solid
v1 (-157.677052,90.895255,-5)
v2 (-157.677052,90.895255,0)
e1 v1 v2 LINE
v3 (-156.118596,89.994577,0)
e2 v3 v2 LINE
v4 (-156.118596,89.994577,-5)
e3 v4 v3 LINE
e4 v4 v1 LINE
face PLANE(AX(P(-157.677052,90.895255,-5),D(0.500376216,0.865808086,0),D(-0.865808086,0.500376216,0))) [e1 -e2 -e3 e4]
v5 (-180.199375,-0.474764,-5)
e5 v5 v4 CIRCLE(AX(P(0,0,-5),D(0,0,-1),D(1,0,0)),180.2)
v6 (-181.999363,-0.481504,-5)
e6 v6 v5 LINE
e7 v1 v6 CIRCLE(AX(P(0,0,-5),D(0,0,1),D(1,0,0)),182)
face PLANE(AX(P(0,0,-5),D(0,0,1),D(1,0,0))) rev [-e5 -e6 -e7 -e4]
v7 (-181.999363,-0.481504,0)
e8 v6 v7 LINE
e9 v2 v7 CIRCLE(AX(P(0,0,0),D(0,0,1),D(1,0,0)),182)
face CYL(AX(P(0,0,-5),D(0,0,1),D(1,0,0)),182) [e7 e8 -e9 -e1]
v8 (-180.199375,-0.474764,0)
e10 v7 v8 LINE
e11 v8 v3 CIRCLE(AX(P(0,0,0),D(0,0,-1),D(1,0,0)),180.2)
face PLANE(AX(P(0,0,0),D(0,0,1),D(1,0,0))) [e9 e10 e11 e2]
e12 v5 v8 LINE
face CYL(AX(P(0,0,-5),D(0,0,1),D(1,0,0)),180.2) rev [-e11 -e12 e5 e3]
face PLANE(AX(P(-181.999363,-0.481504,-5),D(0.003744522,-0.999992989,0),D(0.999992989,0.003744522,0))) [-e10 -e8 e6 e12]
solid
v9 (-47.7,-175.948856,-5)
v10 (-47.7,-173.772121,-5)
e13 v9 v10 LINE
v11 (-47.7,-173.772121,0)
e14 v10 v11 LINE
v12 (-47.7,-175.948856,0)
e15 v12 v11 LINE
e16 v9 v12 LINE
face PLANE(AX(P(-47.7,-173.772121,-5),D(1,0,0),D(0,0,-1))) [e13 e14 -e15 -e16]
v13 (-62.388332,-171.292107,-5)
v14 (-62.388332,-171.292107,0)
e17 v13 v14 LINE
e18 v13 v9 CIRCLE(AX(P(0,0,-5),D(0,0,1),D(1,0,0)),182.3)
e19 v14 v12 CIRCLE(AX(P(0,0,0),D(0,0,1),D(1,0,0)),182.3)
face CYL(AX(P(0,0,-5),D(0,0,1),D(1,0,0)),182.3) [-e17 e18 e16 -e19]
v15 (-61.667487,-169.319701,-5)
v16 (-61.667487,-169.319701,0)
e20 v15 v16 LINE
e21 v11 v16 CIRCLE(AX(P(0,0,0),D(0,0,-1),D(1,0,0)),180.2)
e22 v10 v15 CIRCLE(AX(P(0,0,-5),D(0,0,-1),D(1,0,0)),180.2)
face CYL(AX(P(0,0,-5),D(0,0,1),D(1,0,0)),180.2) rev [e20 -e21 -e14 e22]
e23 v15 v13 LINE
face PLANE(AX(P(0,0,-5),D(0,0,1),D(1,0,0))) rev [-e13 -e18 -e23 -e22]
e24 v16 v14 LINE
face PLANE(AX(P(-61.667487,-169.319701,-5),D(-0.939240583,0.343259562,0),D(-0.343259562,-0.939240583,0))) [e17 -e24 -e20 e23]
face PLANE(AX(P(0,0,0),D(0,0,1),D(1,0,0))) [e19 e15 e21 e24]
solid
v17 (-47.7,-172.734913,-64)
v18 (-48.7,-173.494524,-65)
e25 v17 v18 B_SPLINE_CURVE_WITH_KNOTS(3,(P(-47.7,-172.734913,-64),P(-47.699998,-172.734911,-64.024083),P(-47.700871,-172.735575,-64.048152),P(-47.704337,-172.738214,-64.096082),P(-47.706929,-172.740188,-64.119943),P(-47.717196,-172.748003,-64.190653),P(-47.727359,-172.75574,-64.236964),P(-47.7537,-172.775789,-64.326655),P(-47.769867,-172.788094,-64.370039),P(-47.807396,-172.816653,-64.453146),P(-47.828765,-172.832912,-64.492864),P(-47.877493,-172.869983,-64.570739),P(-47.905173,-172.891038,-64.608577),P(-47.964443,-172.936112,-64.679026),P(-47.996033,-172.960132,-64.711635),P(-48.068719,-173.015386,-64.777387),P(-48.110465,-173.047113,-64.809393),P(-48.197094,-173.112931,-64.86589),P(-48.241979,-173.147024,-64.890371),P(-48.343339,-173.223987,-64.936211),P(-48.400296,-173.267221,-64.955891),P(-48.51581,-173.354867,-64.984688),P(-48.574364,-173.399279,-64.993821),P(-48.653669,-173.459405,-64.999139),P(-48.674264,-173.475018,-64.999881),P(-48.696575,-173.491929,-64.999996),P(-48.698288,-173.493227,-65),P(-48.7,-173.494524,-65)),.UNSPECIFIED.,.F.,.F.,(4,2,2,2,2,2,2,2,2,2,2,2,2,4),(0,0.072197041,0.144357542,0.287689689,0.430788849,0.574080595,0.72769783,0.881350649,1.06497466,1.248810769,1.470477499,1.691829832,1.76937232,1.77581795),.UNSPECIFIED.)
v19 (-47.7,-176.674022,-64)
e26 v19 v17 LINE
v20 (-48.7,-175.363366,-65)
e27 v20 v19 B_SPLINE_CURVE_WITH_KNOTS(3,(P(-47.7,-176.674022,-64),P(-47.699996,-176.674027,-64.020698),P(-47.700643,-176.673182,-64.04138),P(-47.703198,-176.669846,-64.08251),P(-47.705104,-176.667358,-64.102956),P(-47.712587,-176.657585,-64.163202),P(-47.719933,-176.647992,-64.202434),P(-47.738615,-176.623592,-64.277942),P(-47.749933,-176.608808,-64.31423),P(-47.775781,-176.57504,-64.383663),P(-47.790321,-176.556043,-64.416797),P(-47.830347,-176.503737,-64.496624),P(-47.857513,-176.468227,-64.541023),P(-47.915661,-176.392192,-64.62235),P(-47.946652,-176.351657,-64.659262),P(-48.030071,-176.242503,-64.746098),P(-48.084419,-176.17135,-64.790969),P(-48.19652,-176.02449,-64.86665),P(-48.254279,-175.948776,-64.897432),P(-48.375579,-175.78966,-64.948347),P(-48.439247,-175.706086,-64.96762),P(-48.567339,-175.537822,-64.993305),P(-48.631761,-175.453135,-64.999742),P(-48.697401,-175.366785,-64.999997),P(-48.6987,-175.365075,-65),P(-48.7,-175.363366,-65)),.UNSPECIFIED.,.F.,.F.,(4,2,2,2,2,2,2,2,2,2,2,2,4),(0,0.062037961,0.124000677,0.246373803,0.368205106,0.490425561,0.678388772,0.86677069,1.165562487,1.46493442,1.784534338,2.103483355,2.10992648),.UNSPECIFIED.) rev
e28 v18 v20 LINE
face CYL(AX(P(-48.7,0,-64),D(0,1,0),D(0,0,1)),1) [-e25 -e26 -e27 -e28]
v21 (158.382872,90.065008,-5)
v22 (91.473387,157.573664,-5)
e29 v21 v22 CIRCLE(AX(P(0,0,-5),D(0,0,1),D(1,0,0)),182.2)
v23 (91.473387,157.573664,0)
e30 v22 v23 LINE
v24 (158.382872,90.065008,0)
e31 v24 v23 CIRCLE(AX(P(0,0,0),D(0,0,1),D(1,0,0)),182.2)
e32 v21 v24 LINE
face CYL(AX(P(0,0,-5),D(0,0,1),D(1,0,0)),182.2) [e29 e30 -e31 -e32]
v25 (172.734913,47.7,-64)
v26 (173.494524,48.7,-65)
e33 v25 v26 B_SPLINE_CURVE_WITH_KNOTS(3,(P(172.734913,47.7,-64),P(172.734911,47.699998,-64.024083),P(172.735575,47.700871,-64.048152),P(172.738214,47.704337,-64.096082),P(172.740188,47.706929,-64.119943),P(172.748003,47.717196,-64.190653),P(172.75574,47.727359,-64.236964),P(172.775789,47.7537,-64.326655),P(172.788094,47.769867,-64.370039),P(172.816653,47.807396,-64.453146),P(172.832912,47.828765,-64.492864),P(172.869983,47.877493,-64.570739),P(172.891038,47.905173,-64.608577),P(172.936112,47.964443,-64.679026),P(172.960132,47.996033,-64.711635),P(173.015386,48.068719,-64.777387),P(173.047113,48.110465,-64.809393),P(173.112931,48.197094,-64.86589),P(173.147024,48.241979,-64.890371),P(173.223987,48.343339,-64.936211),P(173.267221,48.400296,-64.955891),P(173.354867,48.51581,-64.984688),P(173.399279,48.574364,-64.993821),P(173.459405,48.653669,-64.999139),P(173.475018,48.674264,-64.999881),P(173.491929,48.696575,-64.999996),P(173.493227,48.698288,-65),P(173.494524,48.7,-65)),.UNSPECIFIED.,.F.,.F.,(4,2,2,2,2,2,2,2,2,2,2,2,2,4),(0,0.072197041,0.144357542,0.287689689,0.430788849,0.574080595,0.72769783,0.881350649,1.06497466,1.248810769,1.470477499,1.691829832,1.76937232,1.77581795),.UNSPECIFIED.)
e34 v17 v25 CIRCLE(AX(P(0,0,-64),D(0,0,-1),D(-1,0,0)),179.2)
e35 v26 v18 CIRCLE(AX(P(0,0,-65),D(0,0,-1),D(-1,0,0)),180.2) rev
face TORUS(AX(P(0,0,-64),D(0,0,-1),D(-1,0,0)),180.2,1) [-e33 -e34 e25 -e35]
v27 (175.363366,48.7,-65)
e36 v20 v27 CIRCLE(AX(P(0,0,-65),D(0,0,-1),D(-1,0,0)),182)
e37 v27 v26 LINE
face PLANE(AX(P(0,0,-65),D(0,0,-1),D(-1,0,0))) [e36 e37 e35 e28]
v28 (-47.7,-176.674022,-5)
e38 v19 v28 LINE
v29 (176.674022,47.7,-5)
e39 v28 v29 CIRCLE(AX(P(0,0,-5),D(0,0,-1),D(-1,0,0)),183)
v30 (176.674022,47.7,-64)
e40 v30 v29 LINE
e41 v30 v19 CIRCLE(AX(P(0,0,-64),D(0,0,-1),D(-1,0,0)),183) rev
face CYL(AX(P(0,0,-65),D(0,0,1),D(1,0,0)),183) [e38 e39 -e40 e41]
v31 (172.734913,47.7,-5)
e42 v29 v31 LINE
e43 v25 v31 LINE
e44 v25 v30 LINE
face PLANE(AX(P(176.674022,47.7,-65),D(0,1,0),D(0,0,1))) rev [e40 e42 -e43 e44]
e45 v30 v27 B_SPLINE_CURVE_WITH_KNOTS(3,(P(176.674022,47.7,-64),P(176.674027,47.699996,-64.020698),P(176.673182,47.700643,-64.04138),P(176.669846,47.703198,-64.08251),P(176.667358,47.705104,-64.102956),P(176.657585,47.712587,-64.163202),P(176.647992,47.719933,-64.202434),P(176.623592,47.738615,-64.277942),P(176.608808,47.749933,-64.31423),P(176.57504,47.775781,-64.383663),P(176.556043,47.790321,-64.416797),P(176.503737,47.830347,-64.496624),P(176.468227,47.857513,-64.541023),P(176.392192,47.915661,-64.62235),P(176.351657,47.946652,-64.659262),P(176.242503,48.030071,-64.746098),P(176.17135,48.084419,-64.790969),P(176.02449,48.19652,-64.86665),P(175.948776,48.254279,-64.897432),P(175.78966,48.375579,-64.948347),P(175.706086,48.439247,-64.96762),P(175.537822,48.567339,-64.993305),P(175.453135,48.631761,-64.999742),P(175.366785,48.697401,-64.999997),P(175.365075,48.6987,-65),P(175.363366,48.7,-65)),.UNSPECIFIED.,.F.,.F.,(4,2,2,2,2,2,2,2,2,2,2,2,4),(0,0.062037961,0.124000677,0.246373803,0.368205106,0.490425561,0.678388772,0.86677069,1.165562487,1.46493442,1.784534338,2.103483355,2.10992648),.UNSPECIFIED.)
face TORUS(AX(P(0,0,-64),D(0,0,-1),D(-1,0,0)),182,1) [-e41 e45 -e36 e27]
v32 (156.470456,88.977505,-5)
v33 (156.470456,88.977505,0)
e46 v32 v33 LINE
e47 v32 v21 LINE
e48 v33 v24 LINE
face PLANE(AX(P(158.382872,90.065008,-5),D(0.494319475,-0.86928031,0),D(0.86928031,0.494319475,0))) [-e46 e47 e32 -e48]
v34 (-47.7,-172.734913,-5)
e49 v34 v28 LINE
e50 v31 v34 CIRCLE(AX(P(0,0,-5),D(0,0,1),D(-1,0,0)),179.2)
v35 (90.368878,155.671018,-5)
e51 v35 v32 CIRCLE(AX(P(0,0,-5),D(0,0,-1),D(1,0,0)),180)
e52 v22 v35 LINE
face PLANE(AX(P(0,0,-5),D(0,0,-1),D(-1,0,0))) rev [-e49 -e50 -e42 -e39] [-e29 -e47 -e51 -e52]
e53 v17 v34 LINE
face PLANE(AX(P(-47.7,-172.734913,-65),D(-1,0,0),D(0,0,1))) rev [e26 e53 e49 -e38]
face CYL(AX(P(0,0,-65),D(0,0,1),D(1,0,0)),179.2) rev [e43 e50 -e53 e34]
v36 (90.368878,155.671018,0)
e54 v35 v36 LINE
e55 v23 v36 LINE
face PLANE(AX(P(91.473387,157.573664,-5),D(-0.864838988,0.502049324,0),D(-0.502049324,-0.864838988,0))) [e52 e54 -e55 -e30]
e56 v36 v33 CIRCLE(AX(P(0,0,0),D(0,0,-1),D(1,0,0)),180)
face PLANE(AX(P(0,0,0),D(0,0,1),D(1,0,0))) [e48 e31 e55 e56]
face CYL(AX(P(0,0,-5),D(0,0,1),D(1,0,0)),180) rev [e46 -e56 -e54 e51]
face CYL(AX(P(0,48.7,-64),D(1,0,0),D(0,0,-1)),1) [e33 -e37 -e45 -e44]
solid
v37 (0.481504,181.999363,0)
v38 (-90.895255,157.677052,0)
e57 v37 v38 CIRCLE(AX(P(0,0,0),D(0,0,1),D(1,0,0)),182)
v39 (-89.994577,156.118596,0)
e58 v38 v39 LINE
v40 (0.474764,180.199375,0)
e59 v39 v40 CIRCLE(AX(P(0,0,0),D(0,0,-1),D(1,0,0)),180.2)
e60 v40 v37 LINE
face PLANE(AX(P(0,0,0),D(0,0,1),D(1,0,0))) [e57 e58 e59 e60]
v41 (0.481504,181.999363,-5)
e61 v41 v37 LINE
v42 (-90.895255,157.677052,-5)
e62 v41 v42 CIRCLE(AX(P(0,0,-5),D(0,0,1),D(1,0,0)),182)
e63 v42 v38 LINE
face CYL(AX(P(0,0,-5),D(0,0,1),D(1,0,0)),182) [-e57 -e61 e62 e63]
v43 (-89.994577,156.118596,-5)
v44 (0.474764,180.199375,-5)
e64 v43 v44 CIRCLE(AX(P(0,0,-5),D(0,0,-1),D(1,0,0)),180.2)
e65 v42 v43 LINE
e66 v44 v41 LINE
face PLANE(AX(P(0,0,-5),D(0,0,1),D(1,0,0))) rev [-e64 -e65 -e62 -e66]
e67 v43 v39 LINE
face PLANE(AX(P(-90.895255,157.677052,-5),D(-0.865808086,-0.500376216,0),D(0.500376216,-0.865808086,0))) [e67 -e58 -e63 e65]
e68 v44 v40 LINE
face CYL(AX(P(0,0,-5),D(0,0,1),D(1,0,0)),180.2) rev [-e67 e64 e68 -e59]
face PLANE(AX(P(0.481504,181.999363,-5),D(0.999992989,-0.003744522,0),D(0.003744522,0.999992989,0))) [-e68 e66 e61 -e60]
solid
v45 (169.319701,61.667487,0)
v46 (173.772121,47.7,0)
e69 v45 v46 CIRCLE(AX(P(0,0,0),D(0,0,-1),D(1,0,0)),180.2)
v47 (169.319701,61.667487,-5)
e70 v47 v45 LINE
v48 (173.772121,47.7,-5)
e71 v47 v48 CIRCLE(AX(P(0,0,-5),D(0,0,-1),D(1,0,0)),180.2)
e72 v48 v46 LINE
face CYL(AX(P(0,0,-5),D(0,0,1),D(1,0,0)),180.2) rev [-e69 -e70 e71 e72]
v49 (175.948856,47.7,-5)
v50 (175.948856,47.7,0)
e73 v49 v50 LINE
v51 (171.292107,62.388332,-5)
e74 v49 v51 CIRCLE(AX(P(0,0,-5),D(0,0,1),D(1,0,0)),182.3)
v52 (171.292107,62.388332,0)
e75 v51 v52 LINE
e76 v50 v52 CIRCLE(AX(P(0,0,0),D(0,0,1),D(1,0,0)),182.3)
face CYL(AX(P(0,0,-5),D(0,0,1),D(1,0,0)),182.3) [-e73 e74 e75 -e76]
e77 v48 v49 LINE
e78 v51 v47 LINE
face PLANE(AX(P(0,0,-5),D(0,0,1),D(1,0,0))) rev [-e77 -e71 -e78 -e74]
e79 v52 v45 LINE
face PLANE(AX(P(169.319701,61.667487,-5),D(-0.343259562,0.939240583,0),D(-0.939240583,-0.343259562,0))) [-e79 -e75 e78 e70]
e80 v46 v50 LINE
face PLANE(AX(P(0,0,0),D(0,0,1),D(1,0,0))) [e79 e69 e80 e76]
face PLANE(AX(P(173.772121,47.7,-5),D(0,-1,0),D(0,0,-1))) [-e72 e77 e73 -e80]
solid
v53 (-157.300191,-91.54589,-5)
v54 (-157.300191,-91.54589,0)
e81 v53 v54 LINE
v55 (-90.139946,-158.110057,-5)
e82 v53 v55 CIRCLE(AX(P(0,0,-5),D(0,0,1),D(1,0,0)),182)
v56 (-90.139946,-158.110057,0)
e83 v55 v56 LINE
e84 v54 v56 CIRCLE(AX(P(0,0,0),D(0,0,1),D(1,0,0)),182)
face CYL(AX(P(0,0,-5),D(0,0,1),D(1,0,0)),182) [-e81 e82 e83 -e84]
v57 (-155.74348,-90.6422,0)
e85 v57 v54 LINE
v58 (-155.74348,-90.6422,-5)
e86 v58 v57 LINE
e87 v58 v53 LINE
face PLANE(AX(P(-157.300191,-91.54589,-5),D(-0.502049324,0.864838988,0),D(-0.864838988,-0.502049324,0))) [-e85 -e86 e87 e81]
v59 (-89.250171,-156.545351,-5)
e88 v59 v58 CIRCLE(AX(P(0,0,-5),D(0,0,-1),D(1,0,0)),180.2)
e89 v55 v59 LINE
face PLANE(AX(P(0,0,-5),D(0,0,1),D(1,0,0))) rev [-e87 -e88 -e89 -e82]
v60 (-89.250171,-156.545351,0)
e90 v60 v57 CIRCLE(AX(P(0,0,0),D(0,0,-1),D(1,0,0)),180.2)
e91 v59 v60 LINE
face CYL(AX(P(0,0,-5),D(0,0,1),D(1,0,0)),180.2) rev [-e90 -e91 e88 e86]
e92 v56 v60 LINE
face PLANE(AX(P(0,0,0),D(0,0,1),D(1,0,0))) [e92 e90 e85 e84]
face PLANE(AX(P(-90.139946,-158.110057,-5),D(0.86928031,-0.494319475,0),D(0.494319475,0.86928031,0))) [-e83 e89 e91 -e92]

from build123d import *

# Parameters (mm, degrees)
BOSS_EXTRUDE1_DEPTH   = 5
BOSS_EXTRUDE1_2_DEPTH = 5
BOSS_EXTRUDE1_3_DEPTH = 5
BOSS_EXTRUDE1_4_DEPTH = 5
BOSS_EXTRUDE1_5_DEPTH = 5
BOSS_EXTRUDE1_6_DEPTH = 5
BOSS_EXTRUDE2_DEPTH   = 60
FILLET1_R             = 1
FILLET2_R             = 1


with BuildPart() as part:
    # Sketch1 → Boss-Extrude1 (new body)
    with BuildSketch(Plane.XY):
        with BuildLine():
            Line((158.382872448, 90.065008273), (156.470455766, 88.977505429))
            ThreePointArc((156.470455766, 88.977505429), (127.845298599, 126.710613707), (90.368878394, 155.671017912))
            Line((90.368878394, 155.671017912), (91.473386907, 157.573663687))
            ThreePointArc((91.473386907, 157.573663687), (129.407852249, 128.259298986), (158.382872448, 90.065008273))
        make_face()
    extrude(amount=-BOSS_EXTRUDE1_DEPTH)

    # Sketch2 → Boss-Extrude2 (add)
    with BuildSketch(Plane(origin=(0, 0, -5), x_dir=(-1, 0, 0), z_dir=(0, 0, -1))):
        with BuildLine():
            Line((47.7, -172.73491251), (47.7, -176.674021859))
            ThreePointArc((47.7, -176.674021859), (129.400540957, 129.400540957), (-176.674021859, 47.7))
            Line((-176.674021859, 47.7), (-172.73491251, 47.7))
            ThreePointArc((-172.73491251, 47.7), (126.713535189, 126.713535189), (47.7, -172.73491251))
        make_face()
    extrude(amount=BOSS_EXTRUDE2_DEPTH)

    # Fillet1
    fillet1_edges = [part.edges().sort_by_distance(p)[0] for p in [
        (-126.713535189, 126.713535189, -65),
        (-129.400540957, 129.400540957, -65),
        (174.704467185, 47.7, -65),
    ]]
    fillet(fillet1_edges, radius=FILLET1_R)

    # Fillet2
    # the kernel refuses this fillet: 1 mm, written as the material it takes off along each edge
    with BuildSketch(Plane(origin=(-47.7, -171.272370881, -65), x_dir=(0.0001000100005032703, 0, 0.9999999949989999), z_dir=(0, -1, 0))) as fillet2_piece_1:
        with BuildLine():
            CenterArc((0.999799995, 0.999999995), FILLET2_R, 180.005730151, 90)
            Line((-0.0002, 0.999899985), (-0.0202, 0.999897985))
            ThreePointArc((-0.0202, 0.999897985), (-0.02005, 0.499947997), (-0.02, -2e-06))
            Line((-0.02, -2e-06), (2e-06, -0.02))
            ThreePointArc((2e-06, -0.02), (0.499951998, -0.01995), (0.999902005, -0.02))
            Line((0.999902005, -0.02), (0.999900005, 0))
        make_face()
    extrude(amount=6.865387546, mode=Mode.SUBTRACT)


with BuildPart() as body_2:
    # Sketch1 → Boss-Extrude1 2 (new body)
    with BuildSketch(Plane.XY):
        with BuildLine():
            Line((169.319700725, 61.667486946), (171.292107151, 62.388332466))
            ThreePointArc((171.292107151, 62.388332466), (173.775741793, 55.093389478), (175.948856205, 47.7))
            Line((175.948856205, 47.7), (173.772120894, 47.7))
            ThreePointArc((173.772120894, 47.7), (171.688008284, 54.729039929), (169.319700725, 61.667486946))
        make_face()
    extrude(amount=-BOSS_EXTRUDE1_2_DEPTH)


with BuildPart() as body_3:
    # Sketch1 → Boss-Extrude1 3 (new body)
    with BuildSketch(Plane.XY):
        with BuildLine():
            Line((-90.895254799, 157.67705177), (-89.99457706, 156.118596265))
            ThreePointArc((-89.99457706, 156.118596265), (-46.351054078, 174.136784701), (0.474763766, 180.199374581))
            Line((0.474763766, 180.199374581), (0.481503909, 181.999363059))
            ThreePointArc((0.481503909, 181.999363059), (-46.814050179, 175.876219842), (-90.895254799, 157.67705177))
        make_face()
    extrude(amount=-BOSS_EXTRUDE1_3_DEPTH)


with BuildPart() as body_4:
    # Sketch1 → Boss-Extrude1 4 (new body)
    with BuildSketch(Plane.XY):
        with BuildLine():
            Line((-181.999363059, -0.481503909), (-180.199374581, -0.474763766))
            ThreePointArc((-180.199374581, -0.474763766), (-174.136784701, 46.351054078), (-156.118596265, 89.99457706))
            Line((-156.118596265, 89.99457706), (-157.67705177, 90.895254799))
            ThreePointArc((-157.67705177, 90.895254799), (-175.876219842, 46.814050179), (-181.999363059, -0.481503909))
        make_face()
    extrude(amount=-BOSS_EXTRUDE1_4_DEPTH)


with BuildPart() as body_5:
    # Sketch1 → Boss-Extrude1 5 (new body)
    with BuildSketch(Plane.XY):
        with BuildLine():
            Line((-90.139946119, -158.110056965), (-89.250170522, -156.545351454))
            ThreePointArc((-89.250170522, -156.545351454), (-126.851403278, -127.987348931), (-155.743479859, -90.642200335))
            Line((-155.743479859, -90.642200335), (-157.300190987, -91.54588967))
            ThreePointArc((-157.300190987, -91.54588967), (-128.118509415, -129.265801917), (-90.139946119, -158.110056965))
        make_face()
    extrude(amount=-BOSS_EXTRUDE1_5_DEPTH)


with BuildPart() as body_6:
    # Sketch1 → Boss-Extrude1 6 (new body)
    with BuildSketch(Plane.XY):
        with BuildLine():
            Line((-47.7, -173.772120894), (-47.7, -175.948856205))
            ThreePointArc((-47.7, -175.948856205), (-55.093389478, -173.775741793), (-62.388332466, -171.292107151))
            Line((-62.388332466, -171.292107151), (-61.667486946, -169.319700725))
            ThreePointArc((-61.667486946, -169.319700725), (-54.729039929, -171.688008284), (-47.7, -173.772120894))
        make_face()
    extrude(amount=-BOSS_EXTRUDE1_6_DEPTH)


solid = Compound([part.part, body_2.part, body_3.part, body_4.part, body_5.part, body_6.part])
